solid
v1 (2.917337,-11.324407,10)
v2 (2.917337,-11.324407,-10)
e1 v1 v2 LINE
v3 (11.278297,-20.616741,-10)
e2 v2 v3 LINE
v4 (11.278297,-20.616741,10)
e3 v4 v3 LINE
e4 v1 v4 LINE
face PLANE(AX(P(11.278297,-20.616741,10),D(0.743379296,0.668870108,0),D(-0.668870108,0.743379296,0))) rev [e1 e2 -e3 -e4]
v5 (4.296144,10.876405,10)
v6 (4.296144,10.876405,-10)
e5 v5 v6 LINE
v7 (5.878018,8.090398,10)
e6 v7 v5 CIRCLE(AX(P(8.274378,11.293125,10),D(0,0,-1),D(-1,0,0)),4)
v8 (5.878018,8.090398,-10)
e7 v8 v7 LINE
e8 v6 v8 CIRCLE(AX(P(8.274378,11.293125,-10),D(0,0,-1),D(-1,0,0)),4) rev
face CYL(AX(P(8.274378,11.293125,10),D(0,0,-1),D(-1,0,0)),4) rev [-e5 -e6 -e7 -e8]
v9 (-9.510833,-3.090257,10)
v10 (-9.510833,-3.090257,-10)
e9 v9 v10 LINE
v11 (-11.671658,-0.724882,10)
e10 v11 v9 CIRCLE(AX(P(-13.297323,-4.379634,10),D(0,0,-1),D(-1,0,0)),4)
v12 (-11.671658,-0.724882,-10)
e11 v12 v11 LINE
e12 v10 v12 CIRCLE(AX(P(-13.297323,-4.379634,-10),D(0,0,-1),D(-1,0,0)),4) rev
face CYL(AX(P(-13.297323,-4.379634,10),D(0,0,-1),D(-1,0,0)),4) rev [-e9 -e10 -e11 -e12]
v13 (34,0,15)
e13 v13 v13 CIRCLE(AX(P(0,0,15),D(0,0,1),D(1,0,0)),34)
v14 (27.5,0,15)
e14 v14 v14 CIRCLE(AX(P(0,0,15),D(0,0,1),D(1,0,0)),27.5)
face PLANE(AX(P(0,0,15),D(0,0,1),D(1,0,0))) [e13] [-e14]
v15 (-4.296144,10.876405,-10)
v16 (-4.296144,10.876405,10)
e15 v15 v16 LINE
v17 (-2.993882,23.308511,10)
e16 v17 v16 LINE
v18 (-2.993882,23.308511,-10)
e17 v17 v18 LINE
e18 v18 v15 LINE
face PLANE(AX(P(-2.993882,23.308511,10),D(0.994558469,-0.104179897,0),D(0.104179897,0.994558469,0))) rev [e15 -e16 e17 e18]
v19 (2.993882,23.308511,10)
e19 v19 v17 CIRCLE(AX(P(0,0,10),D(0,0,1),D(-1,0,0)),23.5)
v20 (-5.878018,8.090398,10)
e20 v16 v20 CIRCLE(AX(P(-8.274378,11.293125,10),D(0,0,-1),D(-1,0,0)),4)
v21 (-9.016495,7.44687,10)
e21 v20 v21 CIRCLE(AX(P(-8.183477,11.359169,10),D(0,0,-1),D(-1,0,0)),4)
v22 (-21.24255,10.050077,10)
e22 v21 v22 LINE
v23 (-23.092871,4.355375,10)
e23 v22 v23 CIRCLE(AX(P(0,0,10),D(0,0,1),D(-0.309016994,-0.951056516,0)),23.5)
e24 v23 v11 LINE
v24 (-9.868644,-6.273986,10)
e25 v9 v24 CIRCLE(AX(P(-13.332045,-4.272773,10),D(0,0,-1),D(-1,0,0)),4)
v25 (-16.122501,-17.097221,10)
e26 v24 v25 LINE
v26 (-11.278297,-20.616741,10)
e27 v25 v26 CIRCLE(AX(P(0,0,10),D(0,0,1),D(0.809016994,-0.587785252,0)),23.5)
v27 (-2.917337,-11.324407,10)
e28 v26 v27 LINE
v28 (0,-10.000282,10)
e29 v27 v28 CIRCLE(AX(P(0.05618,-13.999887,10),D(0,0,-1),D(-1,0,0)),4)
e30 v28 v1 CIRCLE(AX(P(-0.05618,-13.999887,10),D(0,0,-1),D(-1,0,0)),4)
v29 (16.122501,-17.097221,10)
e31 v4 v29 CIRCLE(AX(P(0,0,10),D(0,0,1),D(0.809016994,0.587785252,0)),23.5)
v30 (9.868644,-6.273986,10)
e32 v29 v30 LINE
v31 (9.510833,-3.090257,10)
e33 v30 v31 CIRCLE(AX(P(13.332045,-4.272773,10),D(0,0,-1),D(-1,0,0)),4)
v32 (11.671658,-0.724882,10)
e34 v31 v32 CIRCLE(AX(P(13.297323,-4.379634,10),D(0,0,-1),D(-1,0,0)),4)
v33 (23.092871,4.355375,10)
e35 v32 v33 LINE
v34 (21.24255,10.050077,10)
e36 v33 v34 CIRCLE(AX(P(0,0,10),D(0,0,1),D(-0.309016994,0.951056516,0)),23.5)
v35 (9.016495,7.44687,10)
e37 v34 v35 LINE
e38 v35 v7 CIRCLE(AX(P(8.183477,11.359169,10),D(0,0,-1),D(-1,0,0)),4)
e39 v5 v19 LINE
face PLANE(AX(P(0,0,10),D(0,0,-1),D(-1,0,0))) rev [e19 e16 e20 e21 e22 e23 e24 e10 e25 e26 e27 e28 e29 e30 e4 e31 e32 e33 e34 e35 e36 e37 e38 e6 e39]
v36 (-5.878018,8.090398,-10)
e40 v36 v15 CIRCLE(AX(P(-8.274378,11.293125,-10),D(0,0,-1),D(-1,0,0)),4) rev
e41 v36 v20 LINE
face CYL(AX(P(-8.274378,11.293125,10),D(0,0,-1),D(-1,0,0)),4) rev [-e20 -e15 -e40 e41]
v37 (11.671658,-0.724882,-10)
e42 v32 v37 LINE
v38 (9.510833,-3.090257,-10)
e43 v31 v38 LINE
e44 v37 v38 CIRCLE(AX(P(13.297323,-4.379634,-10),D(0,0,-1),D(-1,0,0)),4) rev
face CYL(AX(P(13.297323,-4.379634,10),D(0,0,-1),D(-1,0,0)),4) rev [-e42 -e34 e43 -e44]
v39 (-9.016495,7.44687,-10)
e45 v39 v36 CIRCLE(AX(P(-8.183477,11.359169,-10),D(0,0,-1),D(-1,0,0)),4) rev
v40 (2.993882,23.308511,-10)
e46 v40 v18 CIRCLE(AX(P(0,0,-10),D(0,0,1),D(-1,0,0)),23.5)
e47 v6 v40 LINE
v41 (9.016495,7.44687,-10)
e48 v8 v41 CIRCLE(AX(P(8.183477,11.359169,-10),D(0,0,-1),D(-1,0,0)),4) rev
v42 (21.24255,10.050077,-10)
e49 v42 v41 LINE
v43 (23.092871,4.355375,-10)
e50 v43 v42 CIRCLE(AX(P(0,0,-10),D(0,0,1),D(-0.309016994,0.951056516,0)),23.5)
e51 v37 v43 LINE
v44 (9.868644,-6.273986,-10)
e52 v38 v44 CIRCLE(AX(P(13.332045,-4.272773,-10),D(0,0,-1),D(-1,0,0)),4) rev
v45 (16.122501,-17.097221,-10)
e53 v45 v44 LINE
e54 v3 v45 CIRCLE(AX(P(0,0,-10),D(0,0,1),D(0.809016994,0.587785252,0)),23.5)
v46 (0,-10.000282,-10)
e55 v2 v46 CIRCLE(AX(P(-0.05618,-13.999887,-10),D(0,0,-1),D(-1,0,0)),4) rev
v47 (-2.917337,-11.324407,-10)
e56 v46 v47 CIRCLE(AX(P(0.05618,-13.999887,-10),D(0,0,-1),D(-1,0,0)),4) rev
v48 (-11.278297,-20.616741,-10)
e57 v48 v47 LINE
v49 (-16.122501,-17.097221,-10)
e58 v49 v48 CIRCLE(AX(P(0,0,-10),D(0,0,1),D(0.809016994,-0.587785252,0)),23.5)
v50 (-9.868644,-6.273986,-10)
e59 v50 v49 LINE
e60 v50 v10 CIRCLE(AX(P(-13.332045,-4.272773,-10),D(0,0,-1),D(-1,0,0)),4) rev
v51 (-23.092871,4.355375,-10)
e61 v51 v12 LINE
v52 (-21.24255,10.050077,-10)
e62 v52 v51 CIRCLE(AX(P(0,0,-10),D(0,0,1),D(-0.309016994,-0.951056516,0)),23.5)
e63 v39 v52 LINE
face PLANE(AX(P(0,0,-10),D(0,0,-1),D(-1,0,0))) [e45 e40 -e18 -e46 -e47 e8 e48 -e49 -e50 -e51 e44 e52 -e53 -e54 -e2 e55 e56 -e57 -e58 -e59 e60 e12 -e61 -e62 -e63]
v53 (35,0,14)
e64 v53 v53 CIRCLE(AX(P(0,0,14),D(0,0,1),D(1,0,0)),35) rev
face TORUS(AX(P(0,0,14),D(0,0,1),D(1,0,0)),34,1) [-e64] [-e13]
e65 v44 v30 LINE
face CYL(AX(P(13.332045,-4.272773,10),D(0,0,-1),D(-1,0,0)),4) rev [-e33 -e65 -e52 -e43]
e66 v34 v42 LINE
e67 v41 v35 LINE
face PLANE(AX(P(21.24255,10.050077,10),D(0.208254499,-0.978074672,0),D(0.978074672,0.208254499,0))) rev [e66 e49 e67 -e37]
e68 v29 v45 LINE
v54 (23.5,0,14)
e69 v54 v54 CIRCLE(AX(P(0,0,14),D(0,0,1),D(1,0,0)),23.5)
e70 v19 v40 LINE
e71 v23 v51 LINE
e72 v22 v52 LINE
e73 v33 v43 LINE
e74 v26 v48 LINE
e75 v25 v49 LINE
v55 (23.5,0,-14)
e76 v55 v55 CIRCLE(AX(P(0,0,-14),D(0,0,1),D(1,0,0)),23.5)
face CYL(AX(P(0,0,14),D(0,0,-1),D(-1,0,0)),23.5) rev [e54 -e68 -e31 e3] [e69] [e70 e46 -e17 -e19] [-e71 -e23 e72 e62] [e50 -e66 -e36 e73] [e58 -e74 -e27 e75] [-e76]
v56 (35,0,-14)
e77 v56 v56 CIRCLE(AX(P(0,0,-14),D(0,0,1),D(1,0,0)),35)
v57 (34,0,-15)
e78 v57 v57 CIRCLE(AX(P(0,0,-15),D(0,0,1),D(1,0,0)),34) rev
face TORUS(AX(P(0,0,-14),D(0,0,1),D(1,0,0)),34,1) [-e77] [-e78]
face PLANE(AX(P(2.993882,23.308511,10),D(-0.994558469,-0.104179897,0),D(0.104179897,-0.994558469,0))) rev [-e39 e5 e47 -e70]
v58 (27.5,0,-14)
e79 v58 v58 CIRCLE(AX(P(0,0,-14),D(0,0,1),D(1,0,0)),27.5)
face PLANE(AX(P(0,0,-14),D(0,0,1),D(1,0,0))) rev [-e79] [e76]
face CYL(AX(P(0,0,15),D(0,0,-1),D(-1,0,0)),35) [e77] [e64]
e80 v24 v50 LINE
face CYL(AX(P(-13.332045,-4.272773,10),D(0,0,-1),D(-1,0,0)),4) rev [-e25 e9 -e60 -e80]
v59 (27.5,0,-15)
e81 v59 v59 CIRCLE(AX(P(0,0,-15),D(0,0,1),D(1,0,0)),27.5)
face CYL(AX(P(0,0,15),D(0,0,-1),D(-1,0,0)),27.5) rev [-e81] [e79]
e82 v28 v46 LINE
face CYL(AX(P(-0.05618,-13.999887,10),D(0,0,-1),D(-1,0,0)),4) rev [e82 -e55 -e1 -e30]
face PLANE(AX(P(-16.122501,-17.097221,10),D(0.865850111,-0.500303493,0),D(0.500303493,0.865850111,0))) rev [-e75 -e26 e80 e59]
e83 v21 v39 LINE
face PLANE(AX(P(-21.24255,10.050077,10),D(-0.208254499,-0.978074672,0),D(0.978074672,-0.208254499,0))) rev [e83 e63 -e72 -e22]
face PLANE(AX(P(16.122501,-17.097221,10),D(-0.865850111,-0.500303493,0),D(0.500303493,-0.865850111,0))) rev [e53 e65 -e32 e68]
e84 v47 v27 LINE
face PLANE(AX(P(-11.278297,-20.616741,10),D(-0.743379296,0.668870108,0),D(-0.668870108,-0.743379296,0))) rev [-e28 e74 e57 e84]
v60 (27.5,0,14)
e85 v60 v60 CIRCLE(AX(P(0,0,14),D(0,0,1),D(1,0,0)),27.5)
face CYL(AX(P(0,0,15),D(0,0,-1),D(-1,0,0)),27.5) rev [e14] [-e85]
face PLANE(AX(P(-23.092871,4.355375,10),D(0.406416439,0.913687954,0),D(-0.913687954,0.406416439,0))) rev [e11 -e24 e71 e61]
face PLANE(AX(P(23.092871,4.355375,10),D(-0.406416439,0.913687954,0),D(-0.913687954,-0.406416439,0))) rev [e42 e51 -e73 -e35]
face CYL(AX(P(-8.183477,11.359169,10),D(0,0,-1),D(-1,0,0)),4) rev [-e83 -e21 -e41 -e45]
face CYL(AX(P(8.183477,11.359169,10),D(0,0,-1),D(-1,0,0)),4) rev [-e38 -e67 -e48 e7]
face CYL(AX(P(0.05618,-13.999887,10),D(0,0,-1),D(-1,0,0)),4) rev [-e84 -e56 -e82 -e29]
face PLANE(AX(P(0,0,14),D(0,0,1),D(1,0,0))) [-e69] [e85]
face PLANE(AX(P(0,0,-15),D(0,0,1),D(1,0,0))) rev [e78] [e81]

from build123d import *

# Parameters (mm, degrees)
SKETCH2_R           = 35
SKETCH2_R_2         = 27.5
BOSS_EXTRUDE2_DEPTH = 15
FILLET2_R           = 1
SKETCH4_R           = 27.5
SKETCH4_R_2         = 23.5
BOSS_EXTRUDE4_DEPTH = 14
BOSS_EXTRUDE5_DEPTH = 10
CIRPATTERN1_COUNT   = 5
FILLET3_R           = 4


with BuildPart() as part:
    # Sketch2 → Boss-Extrude2 (new, symmetric)
    with BuildSketch(Plane.XY):
        Circle(SKETCH2_R)
        Circle(SKETCH2_R_2, mode=Mode.SUBTRACT)
    extrude(amount=BOSS_EXTRUDE2_DEPTH, both=True)

    # Fillet2
    fillet2_edges = [part.edges().sort_by_distance(p)[0] for p in [
        (-35, 0, -15),
        (-35, 0, 15),
    ]]
    fillet(fillet2_edges, radius=FILLET2_R)

    # Sketch4 → Boss-Extrude4 (add, symmetric)
    with BuildSketch(Plane.XY):
        Circle(SKETCH4_R)
        Circle(SKETCH4_R_2, mode=Mode.SUBTRACT)
    extrude(amount=BOSS_EXTRUDE4_DEPTH, both=True)

    # Sketch5 → Boss-Extrude5 (add, symmetric)
    with BuildSketch(Plane.XY):
        with BuildLine():
            Line((-2.9938824, 23.308510638), (-4.5, 8.93028555))
            ThreePointArc((-4.5, 8.93028555), (0, -10), (4.5, 8.93028555))
            Line((4.5, 8.93028555), (2.9938824, 23.308510638))
            ThreePointArc((2.9938824, 23.308510638), (0, 23.5), (-2.9938824, 23.308510638))
        make_face()
    boss_extrude5 = extrude(amount=BOSS_EXTRUDE5_DEPTH, both=True)

    # CirPattern1: Boss-Extrude5 ×5 about axis
    cirpattern1_axis = Axis((0, 0, 0), (0, 0, 1))
    for i in range(1, CIRPATTERN1_COUNT):
        add(boss_extrude5.rotate(cirpattern1_axis, i * 360 / CIRPATTERN1_COUNT))

    # Fillet3
    # the kernel refuses this fillet: 4 mm, written as the material it adds along each edge
    with BuildSketch(Plane(origin=(-4.5, 8.93028555, 10), x_dir=(0.10417989743620854, 0.9945584693572224, 0), z_dir=(0, 0, -1)), Plane(origin=(-9.883782739, -1.520144324, 10), x_dir=(-0.9136879543386928, 0.40641643925458404, 0), z_dir=(0, 0, -1)), Plane(origin=(-1.60851367, -9.86978641, 10), x_dir=(-0.6688701083288824, -0.7433792963111827, 0), z_dir=(0, 0, -1)), Plane(origin=(8.88966662, -4.579719139, 10), x_dir=(0.5003034933326179, -0.8658501109078748, 0), z_dir=(0, 0, -1)), Plane(origin=(7.10262979, 7.039364323, 10), x_dir=(0.9780746718987476, 0.20825449860724982, 0), z_dir=(0, 0, -1))) as fillet3_piece_1:
        with BuildLine():
            CenterArc((1.956767483, -4), FILLET3_R, 90, 47.790159625)
            ThreePointArc((-1.005989395, -1.312608759), (-0.475813738, -0.677135992), (0, 0))
            Line((0, 0), (1.956767483, 0))
        make_face()
    extrude(amount=20)
    with BuildSketch(Plane(origin=(-7.10262979, 7.039364323, 10), x_dir=(-0.9780746718987477, 0.20825449860724976, 0), z_dir=(0, 0, -1)), Plane(origin=(-8.88966662, -4.579719139, 10), x_dir=(-0.5003034933326195, -0.8658501109078739, 0), z_dir=(0, 0, -1)), Plane(origin=(1.60851367, -9.86978641, 10), x_dir=(0.6688701083288834, -0.7433792963111817, 0), z_dir=(0, 0, -1)), Plane(origin=(9.883782739, -1.520144324, 10), x_dir=(0.9136879543386924, 0.4064164392545845, 0), z_dir=(0, 0, -1)), Plane(origin=(4.5, 8.93028555, 10), x_dir=(-0.10417989743620937, 0.9945584693572224, 0), z_dir=(0, 0, -1))) as fillet3_piece_2:
        with BuildLine():
            CenterArc((1.956767483, 4), FILLET3_R, 222.209840375, 47.790159625)
            ThreePointArc((-1.005989395, 1.312608759), (-0.475813738, 0.677135992), (0, 0))
            Line((0, 0), (1.956767483, 0))
        make_face()
    extrude(amount=20)


solid = part.part
